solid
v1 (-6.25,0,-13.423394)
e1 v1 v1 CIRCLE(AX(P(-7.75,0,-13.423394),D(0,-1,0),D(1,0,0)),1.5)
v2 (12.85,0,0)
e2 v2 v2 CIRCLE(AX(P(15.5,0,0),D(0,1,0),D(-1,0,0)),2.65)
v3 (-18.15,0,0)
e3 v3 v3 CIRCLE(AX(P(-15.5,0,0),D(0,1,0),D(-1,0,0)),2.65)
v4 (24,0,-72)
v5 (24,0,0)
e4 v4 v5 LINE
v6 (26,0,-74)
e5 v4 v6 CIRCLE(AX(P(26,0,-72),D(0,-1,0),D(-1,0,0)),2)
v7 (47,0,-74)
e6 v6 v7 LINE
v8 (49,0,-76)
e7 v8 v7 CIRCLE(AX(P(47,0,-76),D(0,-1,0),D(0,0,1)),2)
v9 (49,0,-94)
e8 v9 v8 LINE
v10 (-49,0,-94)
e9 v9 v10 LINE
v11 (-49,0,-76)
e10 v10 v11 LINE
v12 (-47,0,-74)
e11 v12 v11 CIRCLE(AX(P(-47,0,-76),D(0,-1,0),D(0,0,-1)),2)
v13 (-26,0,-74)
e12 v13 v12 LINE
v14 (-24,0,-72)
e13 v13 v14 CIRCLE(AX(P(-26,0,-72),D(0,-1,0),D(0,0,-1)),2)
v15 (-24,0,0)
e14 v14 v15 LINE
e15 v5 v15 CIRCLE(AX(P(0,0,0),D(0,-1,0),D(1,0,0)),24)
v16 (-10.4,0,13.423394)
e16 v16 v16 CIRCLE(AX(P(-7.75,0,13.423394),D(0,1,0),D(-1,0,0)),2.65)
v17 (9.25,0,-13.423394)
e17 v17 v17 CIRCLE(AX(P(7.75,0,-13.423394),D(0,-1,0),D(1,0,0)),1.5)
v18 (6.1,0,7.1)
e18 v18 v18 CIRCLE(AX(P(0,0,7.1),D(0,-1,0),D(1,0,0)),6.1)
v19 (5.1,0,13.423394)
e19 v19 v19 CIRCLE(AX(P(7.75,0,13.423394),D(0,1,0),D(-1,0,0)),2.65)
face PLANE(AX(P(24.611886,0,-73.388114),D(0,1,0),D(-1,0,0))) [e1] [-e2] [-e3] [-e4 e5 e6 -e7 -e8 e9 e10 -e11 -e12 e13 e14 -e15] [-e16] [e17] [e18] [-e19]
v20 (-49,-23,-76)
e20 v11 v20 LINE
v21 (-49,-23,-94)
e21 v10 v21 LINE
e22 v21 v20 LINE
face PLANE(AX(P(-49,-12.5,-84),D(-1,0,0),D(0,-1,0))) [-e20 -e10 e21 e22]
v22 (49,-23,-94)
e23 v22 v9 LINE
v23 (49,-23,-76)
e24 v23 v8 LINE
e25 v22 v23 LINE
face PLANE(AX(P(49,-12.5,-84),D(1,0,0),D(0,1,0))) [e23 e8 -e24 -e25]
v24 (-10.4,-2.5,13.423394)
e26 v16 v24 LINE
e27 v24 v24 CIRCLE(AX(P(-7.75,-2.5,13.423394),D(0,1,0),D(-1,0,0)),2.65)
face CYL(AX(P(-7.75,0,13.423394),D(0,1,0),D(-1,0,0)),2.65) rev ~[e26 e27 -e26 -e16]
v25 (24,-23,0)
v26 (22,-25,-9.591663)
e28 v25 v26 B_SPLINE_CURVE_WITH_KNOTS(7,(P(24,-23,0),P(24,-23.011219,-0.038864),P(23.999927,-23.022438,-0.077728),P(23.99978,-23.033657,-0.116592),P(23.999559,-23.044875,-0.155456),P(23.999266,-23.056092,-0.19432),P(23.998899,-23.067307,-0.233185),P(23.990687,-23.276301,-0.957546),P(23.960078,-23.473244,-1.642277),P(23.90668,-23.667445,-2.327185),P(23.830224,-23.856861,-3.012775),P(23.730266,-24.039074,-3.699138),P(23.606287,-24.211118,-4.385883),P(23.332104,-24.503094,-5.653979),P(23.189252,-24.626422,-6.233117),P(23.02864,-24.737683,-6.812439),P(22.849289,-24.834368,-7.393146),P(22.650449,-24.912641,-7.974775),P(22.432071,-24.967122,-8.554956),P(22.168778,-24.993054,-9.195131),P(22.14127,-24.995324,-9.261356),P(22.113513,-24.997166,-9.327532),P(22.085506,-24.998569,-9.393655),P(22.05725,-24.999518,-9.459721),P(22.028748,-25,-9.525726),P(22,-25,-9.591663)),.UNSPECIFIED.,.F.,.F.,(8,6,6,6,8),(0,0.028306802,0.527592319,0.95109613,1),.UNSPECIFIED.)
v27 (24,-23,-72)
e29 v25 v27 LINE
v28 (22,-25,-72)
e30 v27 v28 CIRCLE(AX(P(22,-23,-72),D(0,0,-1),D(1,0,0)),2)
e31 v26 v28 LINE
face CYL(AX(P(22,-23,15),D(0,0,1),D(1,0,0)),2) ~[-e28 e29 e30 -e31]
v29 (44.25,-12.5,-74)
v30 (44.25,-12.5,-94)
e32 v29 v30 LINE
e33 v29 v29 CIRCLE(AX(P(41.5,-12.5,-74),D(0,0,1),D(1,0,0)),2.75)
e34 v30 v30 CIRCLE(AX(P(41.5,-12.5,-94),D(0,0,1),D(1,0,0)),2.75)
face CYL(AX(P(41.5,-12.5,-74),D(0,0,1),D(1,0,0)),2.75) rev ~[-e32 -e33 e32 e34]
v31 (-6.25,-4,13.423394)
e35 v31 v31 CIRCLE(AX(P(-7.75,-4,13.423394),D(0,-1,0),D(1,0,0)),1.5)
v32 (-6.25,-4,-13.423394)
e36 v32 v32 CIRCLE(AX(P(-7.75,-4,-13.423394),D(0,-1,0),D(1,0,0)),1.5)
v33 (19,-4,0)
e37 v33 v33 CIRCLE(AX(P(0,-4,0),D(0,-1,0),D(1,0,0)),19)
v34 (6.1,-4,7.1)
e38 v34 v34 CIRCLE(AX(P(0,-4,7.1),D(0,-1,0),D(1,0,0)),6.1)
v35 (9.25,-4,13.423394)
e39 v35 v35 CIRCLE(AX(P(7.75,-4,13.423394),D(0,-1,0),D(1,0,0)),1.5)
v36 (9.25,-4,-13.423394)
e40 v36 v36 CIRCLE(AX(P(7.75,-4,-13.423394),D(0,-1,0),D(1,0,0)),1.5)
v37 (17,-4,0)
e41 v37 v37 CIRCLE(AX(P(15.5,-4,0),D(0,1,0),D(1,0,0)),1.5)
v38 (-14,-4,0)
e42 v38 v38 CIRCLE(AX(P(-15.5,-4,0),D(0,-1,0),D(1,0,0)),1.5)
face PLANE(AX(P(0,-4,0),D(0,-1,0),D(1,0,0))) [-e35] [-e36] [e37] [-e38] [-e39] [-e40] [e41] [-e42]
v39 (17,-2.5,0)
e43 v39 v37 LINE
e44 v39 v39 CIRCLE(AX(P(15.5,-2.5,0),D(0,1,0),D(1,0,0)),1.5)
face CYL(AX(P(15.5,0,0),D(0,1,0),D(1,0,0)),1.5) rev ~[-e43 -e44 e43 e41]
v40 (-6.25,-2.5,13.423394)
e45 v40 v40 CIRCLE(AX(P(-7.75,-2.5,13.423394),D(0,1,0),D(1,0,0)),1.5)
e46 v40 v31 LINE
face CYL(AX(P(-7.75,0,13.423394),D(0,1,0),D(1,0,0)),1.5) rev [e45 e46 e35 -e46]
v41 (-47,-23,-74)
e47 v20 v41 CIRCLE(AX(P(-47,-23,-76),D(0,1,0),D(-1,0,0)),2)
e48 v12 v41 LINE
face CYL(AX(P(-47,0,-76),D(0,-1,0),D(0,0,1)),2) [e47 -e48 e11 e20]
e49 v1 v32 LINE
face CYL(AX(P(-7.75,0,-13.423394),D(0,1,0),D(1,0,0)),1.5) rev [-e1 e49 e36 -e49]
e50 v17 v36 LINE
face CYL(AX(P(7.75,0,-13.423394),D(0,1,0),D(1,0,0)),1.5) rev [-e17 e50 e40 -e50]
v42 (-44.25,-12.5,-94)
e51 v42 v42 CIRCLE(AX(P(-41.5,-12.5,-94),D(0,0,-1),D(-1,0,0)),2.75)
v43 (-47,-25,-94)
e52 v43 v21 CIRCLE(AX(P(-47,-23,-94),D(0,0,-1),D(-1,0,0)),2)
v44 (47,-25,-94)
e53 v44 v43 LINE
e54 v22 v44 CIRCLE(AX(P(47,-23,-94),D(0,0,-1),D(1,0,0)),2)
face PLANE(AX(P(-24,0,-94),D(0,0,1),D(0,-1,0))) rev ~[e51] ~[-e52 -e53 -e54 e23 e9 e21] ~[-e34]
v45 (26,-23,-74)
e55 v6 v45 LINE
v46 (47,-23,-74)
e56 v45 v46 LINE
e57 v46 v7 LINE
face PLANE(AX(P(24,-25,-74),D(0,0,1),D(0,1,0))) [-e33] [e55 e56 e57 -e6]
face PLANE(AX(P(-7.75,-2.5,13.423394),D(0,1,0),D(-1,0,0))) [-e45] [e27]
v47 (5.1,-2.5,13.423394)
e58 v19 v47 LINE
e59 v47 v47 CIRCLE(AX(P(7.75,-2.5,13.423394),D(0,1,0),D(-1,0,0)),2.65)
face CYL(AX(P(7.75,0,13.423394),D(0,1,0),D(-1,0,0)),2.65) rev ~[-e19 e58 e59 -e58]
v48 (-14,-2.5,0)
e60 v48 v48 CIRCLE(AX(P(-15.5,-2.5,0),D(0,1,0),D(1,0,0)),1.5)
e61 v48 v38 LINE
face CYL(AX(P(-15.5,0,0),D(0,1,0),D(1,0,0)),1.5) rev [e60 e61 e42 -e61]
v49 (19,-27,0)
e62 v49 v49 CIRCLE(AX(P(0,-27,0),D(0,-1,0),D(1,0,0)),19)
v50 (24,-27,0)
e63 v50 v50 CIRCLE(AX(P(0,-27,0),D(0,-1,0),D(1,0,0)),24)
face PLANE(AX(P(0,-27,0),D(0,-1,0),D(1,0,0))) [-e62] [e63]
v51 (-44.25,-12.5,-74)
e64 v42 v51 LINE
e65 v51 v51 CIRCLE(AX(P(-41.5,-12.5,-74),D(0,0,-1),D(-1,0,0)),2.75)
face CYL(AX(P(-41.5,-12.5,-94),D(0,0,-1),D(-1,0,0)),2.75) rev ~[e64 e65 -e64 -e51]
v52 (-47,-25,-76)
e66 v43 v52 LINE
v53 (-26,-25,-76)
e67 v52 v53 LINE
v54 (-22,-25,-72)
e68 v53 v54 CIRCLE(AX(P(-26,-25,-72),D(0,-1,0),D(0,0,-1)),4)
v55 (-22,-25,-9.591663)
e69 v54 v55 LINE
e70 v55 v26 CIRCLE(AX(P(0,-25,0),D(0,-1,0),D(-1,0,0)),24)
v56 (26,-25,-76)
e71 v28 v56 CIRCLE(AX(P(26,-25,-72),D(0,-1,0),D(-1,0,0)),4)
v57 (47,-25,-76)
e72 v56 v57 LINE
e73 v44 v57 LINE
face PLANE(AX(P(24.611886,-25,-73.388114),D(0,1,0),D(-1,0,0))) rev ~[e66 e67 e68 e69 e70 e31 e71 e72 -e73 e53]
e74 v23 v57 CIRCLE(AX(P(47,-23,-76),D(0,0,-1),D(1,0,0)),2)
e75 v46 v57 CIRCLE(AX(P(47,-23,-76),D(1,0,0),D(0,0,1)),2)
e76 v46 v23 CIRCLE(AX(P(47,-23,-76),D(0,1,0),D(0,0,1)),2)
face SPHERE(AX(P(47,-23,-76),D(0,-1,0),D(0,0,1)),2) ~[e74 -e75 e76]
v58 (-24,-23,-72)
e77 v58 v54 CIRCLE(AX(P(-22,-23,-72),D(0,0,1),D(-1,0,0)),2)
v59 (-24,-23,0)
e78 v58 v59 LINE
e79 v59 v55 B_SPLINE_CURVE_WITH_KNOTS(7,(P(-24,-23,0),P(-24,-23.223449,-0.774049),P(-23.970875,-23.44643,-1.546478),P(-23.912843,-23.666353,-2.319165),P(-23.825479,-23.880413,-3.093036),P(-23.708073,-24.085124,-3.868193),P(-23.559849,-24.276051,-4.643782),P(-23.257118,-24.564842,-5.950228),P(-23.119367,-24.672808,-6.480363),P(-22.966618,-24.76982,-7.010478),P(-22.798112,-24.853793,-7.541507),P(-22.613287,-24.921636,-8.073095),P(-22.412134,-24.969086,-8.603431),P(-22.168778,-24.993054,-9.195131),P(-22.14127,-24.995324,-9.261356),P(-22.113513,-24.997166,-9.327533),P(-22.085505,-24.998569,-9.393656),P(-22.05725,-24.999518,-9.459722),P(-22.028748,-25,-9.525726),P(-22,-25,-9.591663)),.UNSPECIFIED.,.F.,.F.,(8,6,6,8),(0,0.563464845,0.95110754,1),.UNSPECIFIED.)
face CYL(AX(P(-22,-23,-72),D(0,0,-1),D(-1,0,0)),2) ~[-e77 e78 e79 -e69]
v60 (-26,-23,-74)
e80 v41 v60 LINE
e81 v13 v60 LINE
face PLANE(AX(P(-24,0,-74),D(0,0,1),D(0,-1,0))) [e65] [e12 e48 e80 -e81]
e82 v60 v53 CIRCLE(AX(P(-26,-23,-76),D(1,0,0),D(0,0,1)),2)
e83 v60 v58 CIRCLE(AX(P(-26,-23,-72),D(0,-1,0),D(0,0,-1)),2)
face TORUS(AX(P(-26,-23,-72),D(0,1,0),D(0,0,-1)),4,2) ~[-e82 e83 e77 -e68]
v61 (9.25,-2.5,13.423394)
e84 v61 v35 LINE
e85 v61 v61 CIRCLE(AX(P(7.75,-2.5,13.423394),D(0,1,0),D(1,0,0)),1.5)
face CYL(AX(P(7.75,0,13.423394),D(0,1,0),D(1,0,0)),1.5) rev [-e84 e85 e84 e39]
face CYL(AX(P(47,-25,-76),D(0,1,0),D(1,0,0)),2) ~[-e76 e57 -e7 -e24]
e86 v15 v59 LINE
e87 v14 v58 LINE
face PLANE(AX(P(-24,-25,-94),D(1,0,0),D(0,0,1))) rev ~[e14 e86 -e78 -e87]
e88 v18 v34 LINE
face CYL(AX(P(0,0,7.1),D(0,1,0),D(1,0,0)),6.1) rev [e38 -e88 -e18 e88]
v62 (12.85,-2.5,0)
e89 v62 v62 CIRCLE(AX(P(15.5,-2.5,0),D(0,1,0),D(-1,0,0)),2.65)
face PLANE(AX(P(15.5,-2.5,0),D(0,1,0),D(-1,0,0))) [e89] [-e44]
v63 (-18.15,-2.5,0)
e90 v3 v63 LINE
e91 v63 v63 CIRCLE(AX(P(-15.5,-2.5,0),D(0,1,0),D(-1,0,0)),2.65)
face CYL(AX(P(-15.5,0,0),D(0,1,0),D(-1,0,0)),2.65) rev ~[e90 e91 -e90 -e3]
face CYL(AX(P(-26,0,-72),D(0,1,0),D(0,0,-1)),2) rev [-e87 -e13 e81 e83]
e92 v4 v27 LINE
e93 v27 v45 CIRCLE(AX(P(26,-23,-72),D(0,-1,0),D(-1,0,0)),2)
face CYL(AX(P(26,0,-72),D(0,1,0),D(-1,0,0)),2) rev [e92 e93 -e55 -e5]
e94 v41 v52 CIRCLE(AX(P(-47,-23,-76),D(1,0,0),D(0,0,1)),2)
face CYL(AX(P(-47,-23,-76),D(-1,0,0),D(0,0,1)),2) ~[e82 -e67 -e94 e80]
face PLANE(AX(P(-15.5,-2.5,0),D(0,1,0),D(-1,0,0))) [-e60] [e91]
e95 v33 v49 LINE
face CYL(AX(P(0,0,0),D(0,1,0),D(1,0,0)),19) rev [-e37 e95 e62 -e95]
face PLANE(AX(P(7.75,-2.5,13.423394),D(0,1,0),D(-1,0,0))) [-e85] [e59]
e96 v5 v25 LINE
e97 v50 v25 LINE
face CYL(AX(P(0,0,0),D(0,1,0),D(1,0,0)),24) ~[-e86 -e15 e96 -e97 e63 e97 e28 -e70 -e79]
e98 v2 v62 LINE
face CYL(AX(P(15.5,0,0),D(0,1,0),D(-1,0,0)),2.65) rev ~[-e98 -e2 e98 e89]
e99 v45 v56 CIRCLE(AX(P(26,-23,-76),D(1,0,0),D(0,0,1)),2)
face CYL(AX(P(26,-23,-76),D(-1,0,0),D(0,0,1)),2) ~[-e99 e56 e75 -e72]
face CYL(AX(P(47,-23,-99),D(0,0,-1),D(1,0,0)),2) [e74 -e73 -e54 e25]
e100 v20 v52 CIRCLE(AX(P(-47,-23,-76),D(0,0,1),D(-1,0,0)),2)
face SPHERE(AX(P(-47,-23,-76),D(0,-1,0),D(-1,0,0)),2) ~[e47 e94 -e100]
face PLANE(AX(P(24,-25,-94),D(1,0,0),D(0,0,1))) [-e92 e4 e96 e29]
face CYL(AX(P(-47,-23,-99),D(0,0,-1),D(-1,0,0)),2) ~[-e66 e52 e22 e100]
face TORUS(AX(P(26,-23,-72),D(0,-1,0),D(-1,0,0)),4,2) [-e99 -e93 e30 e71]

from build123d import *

# Parameters (mm, degrees)
F0_R          = 19
F0_R_2        = 1.5
F0_R_3        = 6.1
F1_DEPTH      = 4
F2_R          = 24
F2_R_2        = 19
F3_DEPTH      = 27
F5_DEPTH      = 25
F6_R          = 2.65
F7_DEPTH      = 2.5
F8_W          = 24
F8_H          = 54
F9_DEPTH      = 25
F10_W         = 25
F10_H         = 20
F11_DEPTH     = 25
F13_W         = 25
F13_H         = 20
F14_DEPTH     = 25
F15_R         = 2
F17_DEPTH     = 25
F18_DEPTH     = 25
F19_T1_DEPTH  = 25
F19_T3_DEPTH  = 21
F19_T5_DEPTH  = 23
F19_T7_DEPTH  = 21
F19_T12_DEPTH = 87
F19_S13_R     = 24
F19_T14_DEPTH = 45
F19_T18_DEPTH = 87
F19_S19_R     = 24
F19_T20_DEPTH = 45
F19_T22_ANGLE = 90
F19_T24_ANGLE = 90
F19_T26_ANGLE = 90
F19_T28_ANGLE = 90


# Not quite as in the source:
# - a fillet or chamfer that OpenCascade refuses, or shapes differently, is made with other operations: its cross-section is extruded or revolved along the edge and cut away or added


with BuildPart() as f1:
    # F0 (on Front) → F1 (new body)
    with BuildSketch(Plane.XZ):
        Circle(F0_R)
        with Locations((-7.75, -13.4233937587)):
            Circle(F0_R_2, mode=Mode.SUBTRACT)
        with Locations((7.75, -13.4233937587)):
            Circle(F0_R_2, mode=Mode.SUBTRACT)
        with Locations((-15.5, 0)):
            Circle(F0_R_2, mode=Mode.SUBTRACT)
        with Locations((-7.75, 13.4233937587)):
            Circle(F0_R_2, mode=Mode.SUBTRACT)
        with Locations((0, 7.1)):
            Circle(F0_R_3, mode=Mode.SUBTRACT)
        with BuildLine():
            ThreePointArc((14, 0), (15.5, 1.5), (17, 0))
            ThreePointArc((17, 0), (15.5, -1.5), (14, 0))
        make_face(mode=Mode.SUBTRACT)
        with Locations((7.75, 13.4233937587)):
            Circle(F0_R_2, mode=Mode.SUBTRACT)
    extrude(amount=F1_DEPTH)

    # F2 (on Front) → F3 (join)
    with BuildSketch(Plane.XZ):
        Circle(F2_R)
        Circle(F2_R_2, mode=Mode.SUBTRACT)
    extrude(amount=F3_DEPTH)

    # F4 (on face) → F5 (join)
    with BuildSketch(Plane(origin=(0, 0, 0), x_dir=(-1, 0, 0), z_dir=(0, 1, 0))):
        with BuildLine():
            Line((24, -40), (24, 0))
            ThreePointArc((24, 0), (0, -24), (-24, 0))
            Line((-24, 0), (-24, -40))
            Line((-24, -40), (0, -40))
            Line((0, -40), (24, -40))
        make_face()
    extrude(amount=-F5_DEPTH)

    # F6 (on face) → F7 (cut)
    with BuildSketch(Plane(origin=(0, 0, 0), x_dir=(-1, 0, 0), z_dir=(0, 1, 0))):
        with Locations((-7.75, 13.4233937587)):
            Circle(F6_R)
        with Locations((7.75, 13.4233937587)):
            Circle(F6_R)
        with Locations((-15.5, 0)):
            Circle(F6_R)
        with Locations((15.5, 0)):
            Circle(F6_R)
    extrude(amount=-F7_DEPTH, mode=Mode.SUBTRACT)

    # F8 (on face) → F9 (join, through all)
    with BuildSketch(Plane.XZ.offset(25)):
        with Locations((12, -67)):
            Rectangle(F8_W, F8_H)
        with Locations((-12, -67)):
            Rectangle(F8_W, F8_H)
    extrude(amount=-F9_DEPTH)

    # F10 (on face) → F11 (join)
    with BuildSketch(Plane.YZ.offset(24)):
        with Locations((-12.5, -84)):
            Rectangle(F10_W, F10_H)
    extrude(amount=F11_DEPTH)

    # F13 (on face) → F14 (join)
    with BuildSketch(Plane(origin=(-24, 0, 0), x_dir=(0, -1, 0), z_dir=(-1, 0, 0))):
        with Locations((12.5, -84)):
            Rectangle(F13_W, F13_H)
    extrude(amount=F14_DEPTH)

    # F15
    f15_edges = [f1.edges().sort_by_distance(p)[0] for p in [
        (49, -12.5, -74),
        (-49, -12.5, -74),
    ]]
    fillet(f15_edges, radius=F15_R)

    # F16 (on face) → F17 (cut)
    with BuildSketch(Plane(origin=(0, 0, -94), x_dir=(1, 0, 0), z_dir=(0, 0, -1))):
        with BuildLine():
            ThreePointArc((-38.75, 12.5), (-41.5, 15.25), (-44.25, 12.5))
            Line((-44.25, 12.5), (-38.75, 12.5))
        make_face()
        with BuildLine():
            Line((-38.75, 12.5), (-44.25, 12.5))
            ThreePointArc((-44.25, 12.5), (-41.5, 9.75), (-38.75, 12.5))
        make_face()
    extrude(amount=-F17_DEPTH, mode=Mode.SUBTRACT)

    # F12 (on face) → F18 (cut)
    with BuildSketch(Plane.XY.offset(-74)):
        with BuildLine():
            ThreePointArc((38.75, -12.5), (41.5, -15.25), (44.25, -12.5))
            Line((44.25, -12.5), (38.75, -12.5))
        make_face()
        with BuildLine():
            Line((38.75, -12.5), (44.25, -12.5))
            ThreePointArc((44.25, -12.5), (41.5, -9.75), (38.75, -12.5))
        make_face()
    extrude(amount=-F18_DEPTH, mode=Mode.SUBTRACT)

    # F19: fillet of radius 2 on 10 edges, made by hand

    # F19_s2 → F19_t1 (join)
    with BuildSketch(Plane.XZ):
        with BuildLine():
            ThreePointArc((24, -72), (24.5857864376, -73.4142135624), (26, -74))
            Line((26, -74), (24, -74))
            Line((24, -74), (24, -72))
        make_face()
        with BuildLine():
            ThreePointArc((-26, -74), (-24.5857864376, -73.4142135624), (-24, -72))
            Line((-24, -72), (-24, -74))
            Line((-24, -74), (-26, -74))
        make_face()
    extrude(amount=F19_T1_DEPTH)

    # F19_s4 → F19_t3 (cut)
    with BuildSketch(Plane.YZ.offset(-47)):
        with BuildLine():
            ThreePointArc((-23, -74), (-24.4142135624, -74.5857864376), (-25, -76))
            Line((-25, -76), (-25, -74))
            Line((-25, -74), (-23, -74))
        make_face()
    extrude(amount=F19_T3_DEPTH, mode=Mode.SUBTRACT)

    # F19_s6 → F19_t5 (cut)
    with BuildSketch(Plane.XY.offset(-99)):
        with BuildLine():
            ThreePointArc((-49, -23), (-48.4142135624, -24.4142135624), (-47, -25))
            Line((-47, -25), (-49, -25))
            Line((-49, -25), (-49, -23))
        make_face()
        with BuildLine():
            ThreePointArc((49, -23), (48.4142135624, -24.4142135624), (47, -25))
            Line((47, -25), (49, -25))
            Line((49, -25), (49, -23))
        make_face()
    extrude(amount=F19_T5_DEPTH, mode=Mode.SUBTRACT)

    # F19_s8 → F19_t7 (cut)
    with BuildSketch(Plane.YZ.offset(26)):
        with BuildLine():
            ThreePointArc((-23, -74), (-24.4142135624, -74.5857864376), (-25, -76))
            Line((-25, -76), (-25, -74))
            Line((-25, -74), (-23, -74))
        make_face()
    extrude(amount=F19_T7_DEPTH, mode=Mode.SUBTRACT)


with BuildPart() as f19_tool10:
    # F19_s11 → F19_t12 (new body)
    with BuildSketch(Plane.XY.offset(15)):
        with BuildLine():
            ThreePointArc((24, -23), (23.4142135624, -24.4142135624), (22, -25))
            Line((22, -25), (24, -25))
            Line((24, -25), (24, -23))
        make_face()
    extrude(amount=-F19_T12_DEPTH)

    # F19_s13 → F19_t14 (cut, symmetric)
    with BuildSketch(Plane.XZ.offset(24)):
        Circle(F19_S13_R)
    extrude(amount=F19_T14_DEPTH, both=True, mode=Mode.SUBTRACT)


with BuildPart() as f1_1:
    add(f1.part)

    # F19_t9: cut F19_tool10
    add(f19_tool10.part, mode=Mode.SUBTRACT)


with BuildPart() as f19_tool16:
    # F19_s17 → F19_t18 (new body)
    with BuildSketch(Plane.XY.offset(-72)):
        with BuildLine():
            ThreePointArc((-24, -23), (-23.4142135624, -24.4142135624), (-22, -25))
            Line((-22, -25), (-24, -25))
            Line((-24, -25), (-24, -23))
        make_face()
    extrude(amount=F19_T18_DEPTH)

    # F19_s19 → F19_t20 (cut, symmetric)
    with BuildSketch(Plane.XZ.offset(24)):
        Circle(F19_S19_R)
    extrude(amount=F19_T20_DEPTH, both=True, mode=Mode.SUBTRACT)


with BuildPart() as f1_2:
    add(f1_1.part)

    # F19_t15: cut F19_tool16
    add(f19_tool16.part, mode=Mode.SUBTRACT)

    # F19_s21 → F19_t22 (revolve, cut)
    with BuildSketch(Plane.XY.offset(-76)):
        with BuildLine():
            ThreePointArc((-49, -23), (-48.4142135624, -24.4142135624), (-47, -25))
            Line((-47, -25), (-49, -25))
            Line((-49, -25), (-49, -23))
        make_face()
    revolve(axis=Axis((-47, -25, -76), (0, 1, 0)), revolution_arc=F19_T22_ANGLE, mode=Mode.SUBTRACT)

    # F19_s23 → F19_t24 (revolve, cut)
    with BuildSketch(Plane.YZ.offset(47)):
        with BuildLine():
            ThreePointArc((-23, -74), (-24.4142135624, -74.5857864376), (-25, -76))
            Line((-25, -76), (-25, -74))
            Line((-25, -74), (-23, -74))
        make_face()
    revolve(axis=Axis((47, -25, -76), (0, 1, 0)), revolution_arc=F19_T24_ANGLE, mode=Mode.SUBTRACT)

    # F19_s25 → F19_t26 (revolve, cut)
    with BuildSketch(Plane.XY.offset(-72)):
        with BuildLine():
            ThreePointArc((22, -25), (23.4142135624, -24.4142135624), (24, -23))
            Line((24, -23), (24, -25))
            Line((24, -25), (22, -25))
        make_face()
    revolve(axis=Axis((26, -25, -72), (0, -1, 0)), revolution_arc=F19_T26_ANGLE, mode=Mode.SUBTRACT)

    # F19_s27 → F19_t28 (revolve, cut)
    with BuildSketch(Plane.YZ.offset(-26)):
        with BuildLine():
            ThreePointArc((-23, -74), (-24.4142135624, -74.5857864376), (-25, -76))
            Line((-25, -76), (-25, -74))
            Line((-25, -74), (-23, -74))
        make_face()
    revolve(axis=Axis((-26, -25, -72), (0, -1, 0)), revolution_arc=F19_T28_ANGLE, mode=Mode.SUBTRACT)


solid = f1_2.part
